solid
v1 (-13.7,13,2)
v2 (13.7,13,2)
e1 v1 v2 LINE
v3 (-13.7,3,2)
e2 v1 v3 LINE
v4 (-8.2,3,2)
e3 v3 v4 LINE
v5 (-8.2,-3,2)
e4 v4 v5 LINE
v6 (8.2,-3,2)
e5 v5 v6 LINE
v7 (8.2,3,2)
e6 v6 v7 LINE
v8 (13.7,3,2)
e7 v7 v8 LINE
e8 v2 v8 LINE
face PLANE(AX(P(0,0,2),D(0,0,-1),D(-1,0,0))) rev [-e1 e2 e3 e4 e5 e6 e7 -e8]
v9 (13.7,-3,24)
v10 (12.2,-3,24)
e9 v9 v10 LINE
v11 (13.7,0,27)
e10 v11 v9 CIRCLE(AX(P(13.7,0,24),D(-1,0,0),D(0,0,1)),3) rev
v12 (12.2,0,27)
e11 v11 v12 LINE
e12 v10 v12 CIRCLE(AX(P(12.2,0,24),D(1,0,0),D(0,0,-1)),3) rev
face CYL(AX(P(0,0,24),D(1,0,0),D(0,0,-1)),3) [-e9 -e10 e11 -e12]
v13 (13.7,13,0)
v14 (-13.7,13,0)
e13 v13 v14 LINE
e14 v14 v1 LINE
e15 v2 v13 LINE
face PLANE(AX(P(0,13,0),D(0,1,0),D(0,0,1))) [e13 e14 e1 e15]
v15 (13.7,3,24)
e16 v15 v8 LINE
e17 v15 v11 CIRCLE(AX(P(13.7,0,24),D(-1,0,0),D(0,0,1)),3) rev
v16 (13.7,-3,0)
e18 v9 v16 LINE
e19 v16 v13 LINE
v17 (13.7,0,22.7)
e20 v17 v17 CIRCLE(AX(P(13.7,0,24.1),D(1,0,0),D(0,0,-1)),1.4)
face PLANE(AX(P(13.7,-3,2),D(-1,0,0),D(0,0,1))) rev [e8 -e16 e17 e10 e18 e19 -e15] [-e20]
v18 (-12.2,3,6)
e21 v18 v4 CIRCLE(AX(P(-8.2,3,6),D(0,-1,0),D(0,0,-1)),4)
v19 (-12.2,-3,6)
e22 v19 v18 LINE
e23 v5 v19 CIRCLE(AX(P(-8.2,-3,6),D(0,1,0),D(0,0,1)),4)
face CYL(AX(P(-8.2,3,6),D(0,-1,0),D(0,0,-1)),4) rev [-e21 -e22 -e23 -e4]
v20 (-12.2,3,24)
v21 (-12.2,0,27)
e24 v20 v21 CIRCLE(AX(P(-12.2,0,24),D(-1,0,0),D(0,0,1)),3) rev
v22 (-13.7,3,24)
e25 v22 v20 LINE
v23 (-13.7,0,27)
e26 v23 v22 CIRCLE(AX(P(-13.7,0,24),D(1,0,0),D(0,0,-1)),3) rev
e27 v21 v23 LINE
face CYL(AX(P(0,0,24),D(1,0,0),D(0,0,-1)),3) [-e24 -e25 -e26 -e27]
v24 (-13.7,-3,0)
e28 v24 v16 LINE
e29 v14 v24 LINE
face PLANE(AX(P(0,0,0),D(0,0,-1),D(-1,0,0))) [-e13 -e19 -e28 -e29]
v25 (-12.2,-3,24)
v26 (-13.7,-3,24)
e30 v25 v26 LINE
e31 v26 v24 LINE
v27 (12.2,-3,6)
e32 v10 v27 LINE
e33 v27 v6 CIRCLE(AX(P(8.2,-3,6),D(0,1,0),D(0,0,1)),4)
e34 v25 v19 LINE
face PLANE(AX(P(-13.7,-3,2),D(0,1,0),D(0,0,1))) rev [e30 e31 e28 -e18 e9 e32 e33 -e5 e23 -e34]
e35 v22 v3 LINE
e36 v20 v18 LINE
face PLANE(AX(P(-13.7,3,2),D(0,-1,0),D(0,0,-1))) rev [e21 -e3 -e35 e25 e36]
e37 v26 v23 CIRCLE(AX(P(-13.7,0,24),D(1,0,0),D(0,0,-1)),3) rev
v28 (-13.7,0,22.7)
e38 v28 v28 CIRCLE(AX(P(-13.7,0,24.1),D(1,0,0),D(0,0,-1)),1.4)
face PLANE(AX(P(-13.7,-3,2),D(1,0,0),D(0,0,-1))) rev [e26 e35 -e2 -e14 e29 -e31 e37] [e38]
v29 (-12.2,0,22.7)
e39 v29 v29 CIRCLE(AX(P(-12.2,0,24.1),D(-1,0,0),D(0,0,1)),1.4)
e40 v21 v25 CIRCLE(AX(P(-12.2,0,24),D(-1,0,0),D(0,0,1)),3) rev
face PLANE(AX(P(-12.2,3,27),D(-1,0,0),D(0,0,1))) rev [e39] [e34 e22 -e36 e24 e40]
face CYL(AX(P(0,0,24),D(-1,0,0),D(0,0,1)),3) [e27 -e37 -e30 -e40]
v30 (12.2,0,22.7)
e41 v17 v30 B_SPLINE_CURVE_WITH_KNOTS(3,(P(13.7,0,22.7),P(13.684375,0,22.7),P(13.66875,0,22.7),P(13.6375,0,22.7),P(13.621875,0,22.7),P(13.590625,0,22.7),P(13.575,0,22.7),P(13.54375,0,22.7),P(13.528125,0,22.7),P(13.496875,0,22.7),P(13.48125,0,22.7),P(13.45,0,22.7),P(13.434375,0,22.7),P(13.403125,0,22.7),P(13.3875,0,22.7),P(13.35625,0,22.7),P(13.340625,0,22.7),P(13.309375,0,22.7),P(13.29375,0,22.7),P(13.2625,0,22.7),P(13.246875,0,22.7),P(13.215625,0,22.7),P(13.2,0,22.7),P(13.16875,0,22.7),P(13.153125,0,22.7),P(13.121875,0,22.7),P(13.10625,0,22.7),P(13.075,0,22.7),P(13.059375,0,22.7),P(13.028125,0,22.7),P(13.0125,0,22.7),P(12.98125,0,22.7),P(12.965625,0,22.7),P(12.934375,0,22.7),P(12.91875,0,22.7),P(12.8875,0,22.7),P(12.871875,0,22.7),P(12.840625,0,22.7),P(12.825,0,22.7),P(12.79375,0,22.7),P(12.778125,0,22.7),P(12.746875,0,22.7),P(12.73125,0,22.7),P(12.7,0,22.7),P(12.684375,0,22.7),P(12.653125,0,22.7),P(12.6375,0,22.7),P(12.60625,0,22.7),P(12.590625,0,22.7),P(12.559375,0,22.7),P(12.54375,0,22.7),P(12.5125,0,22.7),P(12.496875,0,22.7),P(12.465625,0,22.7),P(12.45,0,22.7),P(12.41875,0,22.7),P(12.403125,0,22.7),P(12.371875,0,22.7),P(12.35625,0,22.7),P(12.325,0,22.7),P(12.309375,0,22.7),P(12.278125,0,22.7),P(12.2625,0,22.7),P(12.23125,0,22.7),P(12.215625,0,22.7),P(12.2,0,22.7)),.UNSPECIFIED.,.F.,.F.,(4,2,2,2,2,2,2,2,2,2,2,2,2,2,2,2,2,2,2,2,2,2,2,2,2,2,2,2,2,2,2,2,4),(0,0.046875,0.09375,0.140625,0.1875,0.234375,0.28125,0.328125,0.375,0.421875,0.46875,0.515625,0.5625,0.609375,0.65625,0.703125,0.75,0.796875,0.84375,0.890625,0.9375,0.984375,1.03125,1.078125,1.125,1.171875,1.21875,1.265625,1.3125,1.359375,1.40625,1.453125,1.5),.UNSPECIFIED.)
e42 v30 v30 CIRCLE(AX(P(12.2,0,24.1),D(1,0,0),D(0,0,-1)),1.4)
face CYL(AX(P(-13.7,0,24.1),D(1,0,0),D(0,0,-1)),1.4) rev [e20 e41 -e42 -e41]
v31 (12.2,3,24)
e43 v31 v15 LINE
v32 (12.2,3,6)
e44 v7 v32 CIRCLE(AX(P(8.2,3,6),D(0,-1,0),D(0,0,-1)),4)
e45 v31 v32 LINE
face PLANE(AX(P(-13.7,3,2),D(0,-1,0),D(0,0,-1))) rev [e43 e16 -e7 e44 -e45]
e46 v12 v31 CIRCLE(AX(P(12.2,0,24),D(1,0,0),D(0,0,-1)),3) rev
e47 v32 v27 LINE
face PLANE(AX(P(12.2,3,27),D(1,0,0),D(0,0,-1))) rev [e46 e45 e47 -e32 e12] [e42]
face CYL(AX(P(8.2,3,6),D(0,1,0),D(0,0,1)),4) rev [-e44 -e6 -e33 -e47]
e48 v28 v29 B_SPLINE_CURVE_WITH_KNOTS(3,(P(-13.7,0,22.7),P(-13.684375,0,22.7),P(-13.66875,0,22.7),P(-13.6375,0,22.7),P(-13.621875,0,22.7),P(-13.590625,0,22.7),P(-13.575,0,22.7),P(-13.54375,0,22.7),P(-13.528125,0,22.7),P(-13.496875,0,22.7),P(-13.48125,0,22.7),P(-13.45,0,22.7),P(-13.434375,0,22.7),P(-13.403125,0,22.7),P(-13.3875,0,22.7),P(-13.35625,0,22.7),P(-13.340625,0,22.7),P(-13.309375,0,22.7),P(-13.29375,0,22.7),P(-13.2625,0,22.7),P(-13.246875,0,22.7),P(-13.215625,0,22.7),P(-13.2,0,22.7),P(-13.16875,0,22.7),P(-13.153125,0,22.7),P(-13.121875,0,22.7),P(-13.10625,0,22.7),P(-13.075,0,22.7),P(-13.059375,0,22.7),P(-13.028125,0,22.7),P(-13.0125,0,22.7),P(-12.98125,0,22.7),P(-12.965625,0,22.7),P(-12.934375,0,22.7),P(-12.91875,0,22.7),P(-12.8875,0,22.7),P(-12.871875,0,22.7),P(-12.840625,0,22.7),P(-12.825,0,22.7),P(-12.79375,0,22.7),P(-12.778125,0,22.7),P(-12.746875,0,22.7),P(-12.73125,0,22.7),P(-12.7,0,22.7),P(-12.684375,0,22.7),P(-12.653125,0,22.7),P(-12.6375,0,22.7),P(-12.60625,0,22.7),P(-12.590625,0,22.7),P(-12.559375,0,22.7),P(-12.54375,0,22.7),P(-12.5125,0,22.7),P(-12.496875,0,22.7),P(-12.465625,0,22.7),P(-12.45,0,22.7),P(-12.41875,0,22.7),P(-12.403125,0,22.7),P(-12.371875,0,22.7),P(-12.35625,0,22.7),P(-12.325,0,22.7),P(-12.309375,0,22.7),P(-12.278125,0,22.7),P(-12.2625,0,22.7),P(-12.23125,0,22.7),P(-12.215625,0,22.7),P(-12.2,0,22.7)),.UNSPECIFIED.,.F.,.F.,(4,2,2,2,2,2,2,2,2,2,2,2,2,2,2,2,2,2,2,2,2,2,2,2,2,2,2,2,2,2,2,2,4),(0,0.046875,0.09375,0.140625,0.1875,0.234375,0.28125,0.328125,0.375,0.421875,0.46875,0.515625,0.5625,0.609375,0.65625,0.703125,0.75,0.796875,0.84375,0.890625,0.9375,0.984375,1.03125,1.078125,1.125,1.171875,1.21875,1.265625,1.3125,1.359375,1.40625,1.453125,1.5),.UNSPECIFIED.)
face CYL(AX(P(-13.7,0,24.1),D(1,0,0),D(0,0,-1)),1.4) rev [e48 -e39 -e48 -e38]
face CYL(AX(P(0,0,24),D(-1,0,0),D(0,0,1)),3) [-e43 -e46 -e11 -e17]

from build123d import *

# Parameters (mm, degrees)
SKETCH1_W           = 27.4
SKETCH1_H           = 6
BOSS_EXTRUDE1_DEPTH = 2
SKETCH2_W           = 1.5
SKETCH2_H           = 6
BOSS_EXTRUDE2_DEPTH = 25
SKETCH3_R           = 1.4
CUT_EXTRUDE1_DEPTH  = 39.584452828
FILLET1_R           = 3
SKETCH4_W           = 27.4
SKETCH4_H           = 2
BOSS_EXTRUDE3_DEPTH = 10
FILLET2_R           = 4


with BuildPart() as part:
    # Sketch1 → Boss-Extrude1 (new body)
    with BuildSketch(Plane.XY):
        Rectangle(SKETCH1_W, SKETCH1_H)
    extrude(amount=BOSS_EXTRUDE1_DEPTH)

    # Sketch2 → Boss-Extrude2 (add)
    with BuildSketch(Plane.XY.offset(2)):
        with Locations((-12.95, 0)):
            Rectangle(SKETCH2_W, SKETCH2_H)
        with Locations((12.95, 0)):
            Rectangle(SKETCH2_W, SKETCH2_H)
    extrude(amount=BOSS_EXTRUDE2_DEPTH)

    # Sketch3 → Cut-Extrude1 (cut, through all)
    with BuildSketch(Plane(origin=(13.7, 0, 0), x_dir=(0, 0, -1), z_dir=(1, 0, 0))):
        with Locations((-24.1, 0)):
            Circle(SKETCH3_R)
    extrude(amount=-CUT_EXTRUDE1_DEPTH, mode=Mode.SUBTRACT)

    # Fillet1
    fillet1_edges = [part.edges().sort_by_distance(p)[0] for p in [
        (-12.95, -3, 27),
        (12.95, -3, 27),
        (-12.95, 3, 27),
        (12.95, 3, 27),
    ]]
    fillet(fillet1_edges, radius=FILLET1_R - 0.0001)  # a hair under: the kernel refuses the full size

    # Sketch4 → Boss-Extrude3 (add)
    with BuildSketch(Plane(origin=(0, 3, 0), x_dir=(1, 0, 0), z_dir=(0, 1, 0))):
        with Locations((0, -1)):
            Rectangle(SKETCH4_W, SKETCH4_H)
    extrude(amount=BOSS_EXTRUDE3_DEPTH)

    # Fillet2
    fillet2_edges = [part.edges().sort_by_distance(p)[0] for p in [
        (12.2, 0, 2),
        (-12.2, 0, 2),
    ]]
    fillet(fillet2_edges, radius=FILLET2_R)


solid = part.part
